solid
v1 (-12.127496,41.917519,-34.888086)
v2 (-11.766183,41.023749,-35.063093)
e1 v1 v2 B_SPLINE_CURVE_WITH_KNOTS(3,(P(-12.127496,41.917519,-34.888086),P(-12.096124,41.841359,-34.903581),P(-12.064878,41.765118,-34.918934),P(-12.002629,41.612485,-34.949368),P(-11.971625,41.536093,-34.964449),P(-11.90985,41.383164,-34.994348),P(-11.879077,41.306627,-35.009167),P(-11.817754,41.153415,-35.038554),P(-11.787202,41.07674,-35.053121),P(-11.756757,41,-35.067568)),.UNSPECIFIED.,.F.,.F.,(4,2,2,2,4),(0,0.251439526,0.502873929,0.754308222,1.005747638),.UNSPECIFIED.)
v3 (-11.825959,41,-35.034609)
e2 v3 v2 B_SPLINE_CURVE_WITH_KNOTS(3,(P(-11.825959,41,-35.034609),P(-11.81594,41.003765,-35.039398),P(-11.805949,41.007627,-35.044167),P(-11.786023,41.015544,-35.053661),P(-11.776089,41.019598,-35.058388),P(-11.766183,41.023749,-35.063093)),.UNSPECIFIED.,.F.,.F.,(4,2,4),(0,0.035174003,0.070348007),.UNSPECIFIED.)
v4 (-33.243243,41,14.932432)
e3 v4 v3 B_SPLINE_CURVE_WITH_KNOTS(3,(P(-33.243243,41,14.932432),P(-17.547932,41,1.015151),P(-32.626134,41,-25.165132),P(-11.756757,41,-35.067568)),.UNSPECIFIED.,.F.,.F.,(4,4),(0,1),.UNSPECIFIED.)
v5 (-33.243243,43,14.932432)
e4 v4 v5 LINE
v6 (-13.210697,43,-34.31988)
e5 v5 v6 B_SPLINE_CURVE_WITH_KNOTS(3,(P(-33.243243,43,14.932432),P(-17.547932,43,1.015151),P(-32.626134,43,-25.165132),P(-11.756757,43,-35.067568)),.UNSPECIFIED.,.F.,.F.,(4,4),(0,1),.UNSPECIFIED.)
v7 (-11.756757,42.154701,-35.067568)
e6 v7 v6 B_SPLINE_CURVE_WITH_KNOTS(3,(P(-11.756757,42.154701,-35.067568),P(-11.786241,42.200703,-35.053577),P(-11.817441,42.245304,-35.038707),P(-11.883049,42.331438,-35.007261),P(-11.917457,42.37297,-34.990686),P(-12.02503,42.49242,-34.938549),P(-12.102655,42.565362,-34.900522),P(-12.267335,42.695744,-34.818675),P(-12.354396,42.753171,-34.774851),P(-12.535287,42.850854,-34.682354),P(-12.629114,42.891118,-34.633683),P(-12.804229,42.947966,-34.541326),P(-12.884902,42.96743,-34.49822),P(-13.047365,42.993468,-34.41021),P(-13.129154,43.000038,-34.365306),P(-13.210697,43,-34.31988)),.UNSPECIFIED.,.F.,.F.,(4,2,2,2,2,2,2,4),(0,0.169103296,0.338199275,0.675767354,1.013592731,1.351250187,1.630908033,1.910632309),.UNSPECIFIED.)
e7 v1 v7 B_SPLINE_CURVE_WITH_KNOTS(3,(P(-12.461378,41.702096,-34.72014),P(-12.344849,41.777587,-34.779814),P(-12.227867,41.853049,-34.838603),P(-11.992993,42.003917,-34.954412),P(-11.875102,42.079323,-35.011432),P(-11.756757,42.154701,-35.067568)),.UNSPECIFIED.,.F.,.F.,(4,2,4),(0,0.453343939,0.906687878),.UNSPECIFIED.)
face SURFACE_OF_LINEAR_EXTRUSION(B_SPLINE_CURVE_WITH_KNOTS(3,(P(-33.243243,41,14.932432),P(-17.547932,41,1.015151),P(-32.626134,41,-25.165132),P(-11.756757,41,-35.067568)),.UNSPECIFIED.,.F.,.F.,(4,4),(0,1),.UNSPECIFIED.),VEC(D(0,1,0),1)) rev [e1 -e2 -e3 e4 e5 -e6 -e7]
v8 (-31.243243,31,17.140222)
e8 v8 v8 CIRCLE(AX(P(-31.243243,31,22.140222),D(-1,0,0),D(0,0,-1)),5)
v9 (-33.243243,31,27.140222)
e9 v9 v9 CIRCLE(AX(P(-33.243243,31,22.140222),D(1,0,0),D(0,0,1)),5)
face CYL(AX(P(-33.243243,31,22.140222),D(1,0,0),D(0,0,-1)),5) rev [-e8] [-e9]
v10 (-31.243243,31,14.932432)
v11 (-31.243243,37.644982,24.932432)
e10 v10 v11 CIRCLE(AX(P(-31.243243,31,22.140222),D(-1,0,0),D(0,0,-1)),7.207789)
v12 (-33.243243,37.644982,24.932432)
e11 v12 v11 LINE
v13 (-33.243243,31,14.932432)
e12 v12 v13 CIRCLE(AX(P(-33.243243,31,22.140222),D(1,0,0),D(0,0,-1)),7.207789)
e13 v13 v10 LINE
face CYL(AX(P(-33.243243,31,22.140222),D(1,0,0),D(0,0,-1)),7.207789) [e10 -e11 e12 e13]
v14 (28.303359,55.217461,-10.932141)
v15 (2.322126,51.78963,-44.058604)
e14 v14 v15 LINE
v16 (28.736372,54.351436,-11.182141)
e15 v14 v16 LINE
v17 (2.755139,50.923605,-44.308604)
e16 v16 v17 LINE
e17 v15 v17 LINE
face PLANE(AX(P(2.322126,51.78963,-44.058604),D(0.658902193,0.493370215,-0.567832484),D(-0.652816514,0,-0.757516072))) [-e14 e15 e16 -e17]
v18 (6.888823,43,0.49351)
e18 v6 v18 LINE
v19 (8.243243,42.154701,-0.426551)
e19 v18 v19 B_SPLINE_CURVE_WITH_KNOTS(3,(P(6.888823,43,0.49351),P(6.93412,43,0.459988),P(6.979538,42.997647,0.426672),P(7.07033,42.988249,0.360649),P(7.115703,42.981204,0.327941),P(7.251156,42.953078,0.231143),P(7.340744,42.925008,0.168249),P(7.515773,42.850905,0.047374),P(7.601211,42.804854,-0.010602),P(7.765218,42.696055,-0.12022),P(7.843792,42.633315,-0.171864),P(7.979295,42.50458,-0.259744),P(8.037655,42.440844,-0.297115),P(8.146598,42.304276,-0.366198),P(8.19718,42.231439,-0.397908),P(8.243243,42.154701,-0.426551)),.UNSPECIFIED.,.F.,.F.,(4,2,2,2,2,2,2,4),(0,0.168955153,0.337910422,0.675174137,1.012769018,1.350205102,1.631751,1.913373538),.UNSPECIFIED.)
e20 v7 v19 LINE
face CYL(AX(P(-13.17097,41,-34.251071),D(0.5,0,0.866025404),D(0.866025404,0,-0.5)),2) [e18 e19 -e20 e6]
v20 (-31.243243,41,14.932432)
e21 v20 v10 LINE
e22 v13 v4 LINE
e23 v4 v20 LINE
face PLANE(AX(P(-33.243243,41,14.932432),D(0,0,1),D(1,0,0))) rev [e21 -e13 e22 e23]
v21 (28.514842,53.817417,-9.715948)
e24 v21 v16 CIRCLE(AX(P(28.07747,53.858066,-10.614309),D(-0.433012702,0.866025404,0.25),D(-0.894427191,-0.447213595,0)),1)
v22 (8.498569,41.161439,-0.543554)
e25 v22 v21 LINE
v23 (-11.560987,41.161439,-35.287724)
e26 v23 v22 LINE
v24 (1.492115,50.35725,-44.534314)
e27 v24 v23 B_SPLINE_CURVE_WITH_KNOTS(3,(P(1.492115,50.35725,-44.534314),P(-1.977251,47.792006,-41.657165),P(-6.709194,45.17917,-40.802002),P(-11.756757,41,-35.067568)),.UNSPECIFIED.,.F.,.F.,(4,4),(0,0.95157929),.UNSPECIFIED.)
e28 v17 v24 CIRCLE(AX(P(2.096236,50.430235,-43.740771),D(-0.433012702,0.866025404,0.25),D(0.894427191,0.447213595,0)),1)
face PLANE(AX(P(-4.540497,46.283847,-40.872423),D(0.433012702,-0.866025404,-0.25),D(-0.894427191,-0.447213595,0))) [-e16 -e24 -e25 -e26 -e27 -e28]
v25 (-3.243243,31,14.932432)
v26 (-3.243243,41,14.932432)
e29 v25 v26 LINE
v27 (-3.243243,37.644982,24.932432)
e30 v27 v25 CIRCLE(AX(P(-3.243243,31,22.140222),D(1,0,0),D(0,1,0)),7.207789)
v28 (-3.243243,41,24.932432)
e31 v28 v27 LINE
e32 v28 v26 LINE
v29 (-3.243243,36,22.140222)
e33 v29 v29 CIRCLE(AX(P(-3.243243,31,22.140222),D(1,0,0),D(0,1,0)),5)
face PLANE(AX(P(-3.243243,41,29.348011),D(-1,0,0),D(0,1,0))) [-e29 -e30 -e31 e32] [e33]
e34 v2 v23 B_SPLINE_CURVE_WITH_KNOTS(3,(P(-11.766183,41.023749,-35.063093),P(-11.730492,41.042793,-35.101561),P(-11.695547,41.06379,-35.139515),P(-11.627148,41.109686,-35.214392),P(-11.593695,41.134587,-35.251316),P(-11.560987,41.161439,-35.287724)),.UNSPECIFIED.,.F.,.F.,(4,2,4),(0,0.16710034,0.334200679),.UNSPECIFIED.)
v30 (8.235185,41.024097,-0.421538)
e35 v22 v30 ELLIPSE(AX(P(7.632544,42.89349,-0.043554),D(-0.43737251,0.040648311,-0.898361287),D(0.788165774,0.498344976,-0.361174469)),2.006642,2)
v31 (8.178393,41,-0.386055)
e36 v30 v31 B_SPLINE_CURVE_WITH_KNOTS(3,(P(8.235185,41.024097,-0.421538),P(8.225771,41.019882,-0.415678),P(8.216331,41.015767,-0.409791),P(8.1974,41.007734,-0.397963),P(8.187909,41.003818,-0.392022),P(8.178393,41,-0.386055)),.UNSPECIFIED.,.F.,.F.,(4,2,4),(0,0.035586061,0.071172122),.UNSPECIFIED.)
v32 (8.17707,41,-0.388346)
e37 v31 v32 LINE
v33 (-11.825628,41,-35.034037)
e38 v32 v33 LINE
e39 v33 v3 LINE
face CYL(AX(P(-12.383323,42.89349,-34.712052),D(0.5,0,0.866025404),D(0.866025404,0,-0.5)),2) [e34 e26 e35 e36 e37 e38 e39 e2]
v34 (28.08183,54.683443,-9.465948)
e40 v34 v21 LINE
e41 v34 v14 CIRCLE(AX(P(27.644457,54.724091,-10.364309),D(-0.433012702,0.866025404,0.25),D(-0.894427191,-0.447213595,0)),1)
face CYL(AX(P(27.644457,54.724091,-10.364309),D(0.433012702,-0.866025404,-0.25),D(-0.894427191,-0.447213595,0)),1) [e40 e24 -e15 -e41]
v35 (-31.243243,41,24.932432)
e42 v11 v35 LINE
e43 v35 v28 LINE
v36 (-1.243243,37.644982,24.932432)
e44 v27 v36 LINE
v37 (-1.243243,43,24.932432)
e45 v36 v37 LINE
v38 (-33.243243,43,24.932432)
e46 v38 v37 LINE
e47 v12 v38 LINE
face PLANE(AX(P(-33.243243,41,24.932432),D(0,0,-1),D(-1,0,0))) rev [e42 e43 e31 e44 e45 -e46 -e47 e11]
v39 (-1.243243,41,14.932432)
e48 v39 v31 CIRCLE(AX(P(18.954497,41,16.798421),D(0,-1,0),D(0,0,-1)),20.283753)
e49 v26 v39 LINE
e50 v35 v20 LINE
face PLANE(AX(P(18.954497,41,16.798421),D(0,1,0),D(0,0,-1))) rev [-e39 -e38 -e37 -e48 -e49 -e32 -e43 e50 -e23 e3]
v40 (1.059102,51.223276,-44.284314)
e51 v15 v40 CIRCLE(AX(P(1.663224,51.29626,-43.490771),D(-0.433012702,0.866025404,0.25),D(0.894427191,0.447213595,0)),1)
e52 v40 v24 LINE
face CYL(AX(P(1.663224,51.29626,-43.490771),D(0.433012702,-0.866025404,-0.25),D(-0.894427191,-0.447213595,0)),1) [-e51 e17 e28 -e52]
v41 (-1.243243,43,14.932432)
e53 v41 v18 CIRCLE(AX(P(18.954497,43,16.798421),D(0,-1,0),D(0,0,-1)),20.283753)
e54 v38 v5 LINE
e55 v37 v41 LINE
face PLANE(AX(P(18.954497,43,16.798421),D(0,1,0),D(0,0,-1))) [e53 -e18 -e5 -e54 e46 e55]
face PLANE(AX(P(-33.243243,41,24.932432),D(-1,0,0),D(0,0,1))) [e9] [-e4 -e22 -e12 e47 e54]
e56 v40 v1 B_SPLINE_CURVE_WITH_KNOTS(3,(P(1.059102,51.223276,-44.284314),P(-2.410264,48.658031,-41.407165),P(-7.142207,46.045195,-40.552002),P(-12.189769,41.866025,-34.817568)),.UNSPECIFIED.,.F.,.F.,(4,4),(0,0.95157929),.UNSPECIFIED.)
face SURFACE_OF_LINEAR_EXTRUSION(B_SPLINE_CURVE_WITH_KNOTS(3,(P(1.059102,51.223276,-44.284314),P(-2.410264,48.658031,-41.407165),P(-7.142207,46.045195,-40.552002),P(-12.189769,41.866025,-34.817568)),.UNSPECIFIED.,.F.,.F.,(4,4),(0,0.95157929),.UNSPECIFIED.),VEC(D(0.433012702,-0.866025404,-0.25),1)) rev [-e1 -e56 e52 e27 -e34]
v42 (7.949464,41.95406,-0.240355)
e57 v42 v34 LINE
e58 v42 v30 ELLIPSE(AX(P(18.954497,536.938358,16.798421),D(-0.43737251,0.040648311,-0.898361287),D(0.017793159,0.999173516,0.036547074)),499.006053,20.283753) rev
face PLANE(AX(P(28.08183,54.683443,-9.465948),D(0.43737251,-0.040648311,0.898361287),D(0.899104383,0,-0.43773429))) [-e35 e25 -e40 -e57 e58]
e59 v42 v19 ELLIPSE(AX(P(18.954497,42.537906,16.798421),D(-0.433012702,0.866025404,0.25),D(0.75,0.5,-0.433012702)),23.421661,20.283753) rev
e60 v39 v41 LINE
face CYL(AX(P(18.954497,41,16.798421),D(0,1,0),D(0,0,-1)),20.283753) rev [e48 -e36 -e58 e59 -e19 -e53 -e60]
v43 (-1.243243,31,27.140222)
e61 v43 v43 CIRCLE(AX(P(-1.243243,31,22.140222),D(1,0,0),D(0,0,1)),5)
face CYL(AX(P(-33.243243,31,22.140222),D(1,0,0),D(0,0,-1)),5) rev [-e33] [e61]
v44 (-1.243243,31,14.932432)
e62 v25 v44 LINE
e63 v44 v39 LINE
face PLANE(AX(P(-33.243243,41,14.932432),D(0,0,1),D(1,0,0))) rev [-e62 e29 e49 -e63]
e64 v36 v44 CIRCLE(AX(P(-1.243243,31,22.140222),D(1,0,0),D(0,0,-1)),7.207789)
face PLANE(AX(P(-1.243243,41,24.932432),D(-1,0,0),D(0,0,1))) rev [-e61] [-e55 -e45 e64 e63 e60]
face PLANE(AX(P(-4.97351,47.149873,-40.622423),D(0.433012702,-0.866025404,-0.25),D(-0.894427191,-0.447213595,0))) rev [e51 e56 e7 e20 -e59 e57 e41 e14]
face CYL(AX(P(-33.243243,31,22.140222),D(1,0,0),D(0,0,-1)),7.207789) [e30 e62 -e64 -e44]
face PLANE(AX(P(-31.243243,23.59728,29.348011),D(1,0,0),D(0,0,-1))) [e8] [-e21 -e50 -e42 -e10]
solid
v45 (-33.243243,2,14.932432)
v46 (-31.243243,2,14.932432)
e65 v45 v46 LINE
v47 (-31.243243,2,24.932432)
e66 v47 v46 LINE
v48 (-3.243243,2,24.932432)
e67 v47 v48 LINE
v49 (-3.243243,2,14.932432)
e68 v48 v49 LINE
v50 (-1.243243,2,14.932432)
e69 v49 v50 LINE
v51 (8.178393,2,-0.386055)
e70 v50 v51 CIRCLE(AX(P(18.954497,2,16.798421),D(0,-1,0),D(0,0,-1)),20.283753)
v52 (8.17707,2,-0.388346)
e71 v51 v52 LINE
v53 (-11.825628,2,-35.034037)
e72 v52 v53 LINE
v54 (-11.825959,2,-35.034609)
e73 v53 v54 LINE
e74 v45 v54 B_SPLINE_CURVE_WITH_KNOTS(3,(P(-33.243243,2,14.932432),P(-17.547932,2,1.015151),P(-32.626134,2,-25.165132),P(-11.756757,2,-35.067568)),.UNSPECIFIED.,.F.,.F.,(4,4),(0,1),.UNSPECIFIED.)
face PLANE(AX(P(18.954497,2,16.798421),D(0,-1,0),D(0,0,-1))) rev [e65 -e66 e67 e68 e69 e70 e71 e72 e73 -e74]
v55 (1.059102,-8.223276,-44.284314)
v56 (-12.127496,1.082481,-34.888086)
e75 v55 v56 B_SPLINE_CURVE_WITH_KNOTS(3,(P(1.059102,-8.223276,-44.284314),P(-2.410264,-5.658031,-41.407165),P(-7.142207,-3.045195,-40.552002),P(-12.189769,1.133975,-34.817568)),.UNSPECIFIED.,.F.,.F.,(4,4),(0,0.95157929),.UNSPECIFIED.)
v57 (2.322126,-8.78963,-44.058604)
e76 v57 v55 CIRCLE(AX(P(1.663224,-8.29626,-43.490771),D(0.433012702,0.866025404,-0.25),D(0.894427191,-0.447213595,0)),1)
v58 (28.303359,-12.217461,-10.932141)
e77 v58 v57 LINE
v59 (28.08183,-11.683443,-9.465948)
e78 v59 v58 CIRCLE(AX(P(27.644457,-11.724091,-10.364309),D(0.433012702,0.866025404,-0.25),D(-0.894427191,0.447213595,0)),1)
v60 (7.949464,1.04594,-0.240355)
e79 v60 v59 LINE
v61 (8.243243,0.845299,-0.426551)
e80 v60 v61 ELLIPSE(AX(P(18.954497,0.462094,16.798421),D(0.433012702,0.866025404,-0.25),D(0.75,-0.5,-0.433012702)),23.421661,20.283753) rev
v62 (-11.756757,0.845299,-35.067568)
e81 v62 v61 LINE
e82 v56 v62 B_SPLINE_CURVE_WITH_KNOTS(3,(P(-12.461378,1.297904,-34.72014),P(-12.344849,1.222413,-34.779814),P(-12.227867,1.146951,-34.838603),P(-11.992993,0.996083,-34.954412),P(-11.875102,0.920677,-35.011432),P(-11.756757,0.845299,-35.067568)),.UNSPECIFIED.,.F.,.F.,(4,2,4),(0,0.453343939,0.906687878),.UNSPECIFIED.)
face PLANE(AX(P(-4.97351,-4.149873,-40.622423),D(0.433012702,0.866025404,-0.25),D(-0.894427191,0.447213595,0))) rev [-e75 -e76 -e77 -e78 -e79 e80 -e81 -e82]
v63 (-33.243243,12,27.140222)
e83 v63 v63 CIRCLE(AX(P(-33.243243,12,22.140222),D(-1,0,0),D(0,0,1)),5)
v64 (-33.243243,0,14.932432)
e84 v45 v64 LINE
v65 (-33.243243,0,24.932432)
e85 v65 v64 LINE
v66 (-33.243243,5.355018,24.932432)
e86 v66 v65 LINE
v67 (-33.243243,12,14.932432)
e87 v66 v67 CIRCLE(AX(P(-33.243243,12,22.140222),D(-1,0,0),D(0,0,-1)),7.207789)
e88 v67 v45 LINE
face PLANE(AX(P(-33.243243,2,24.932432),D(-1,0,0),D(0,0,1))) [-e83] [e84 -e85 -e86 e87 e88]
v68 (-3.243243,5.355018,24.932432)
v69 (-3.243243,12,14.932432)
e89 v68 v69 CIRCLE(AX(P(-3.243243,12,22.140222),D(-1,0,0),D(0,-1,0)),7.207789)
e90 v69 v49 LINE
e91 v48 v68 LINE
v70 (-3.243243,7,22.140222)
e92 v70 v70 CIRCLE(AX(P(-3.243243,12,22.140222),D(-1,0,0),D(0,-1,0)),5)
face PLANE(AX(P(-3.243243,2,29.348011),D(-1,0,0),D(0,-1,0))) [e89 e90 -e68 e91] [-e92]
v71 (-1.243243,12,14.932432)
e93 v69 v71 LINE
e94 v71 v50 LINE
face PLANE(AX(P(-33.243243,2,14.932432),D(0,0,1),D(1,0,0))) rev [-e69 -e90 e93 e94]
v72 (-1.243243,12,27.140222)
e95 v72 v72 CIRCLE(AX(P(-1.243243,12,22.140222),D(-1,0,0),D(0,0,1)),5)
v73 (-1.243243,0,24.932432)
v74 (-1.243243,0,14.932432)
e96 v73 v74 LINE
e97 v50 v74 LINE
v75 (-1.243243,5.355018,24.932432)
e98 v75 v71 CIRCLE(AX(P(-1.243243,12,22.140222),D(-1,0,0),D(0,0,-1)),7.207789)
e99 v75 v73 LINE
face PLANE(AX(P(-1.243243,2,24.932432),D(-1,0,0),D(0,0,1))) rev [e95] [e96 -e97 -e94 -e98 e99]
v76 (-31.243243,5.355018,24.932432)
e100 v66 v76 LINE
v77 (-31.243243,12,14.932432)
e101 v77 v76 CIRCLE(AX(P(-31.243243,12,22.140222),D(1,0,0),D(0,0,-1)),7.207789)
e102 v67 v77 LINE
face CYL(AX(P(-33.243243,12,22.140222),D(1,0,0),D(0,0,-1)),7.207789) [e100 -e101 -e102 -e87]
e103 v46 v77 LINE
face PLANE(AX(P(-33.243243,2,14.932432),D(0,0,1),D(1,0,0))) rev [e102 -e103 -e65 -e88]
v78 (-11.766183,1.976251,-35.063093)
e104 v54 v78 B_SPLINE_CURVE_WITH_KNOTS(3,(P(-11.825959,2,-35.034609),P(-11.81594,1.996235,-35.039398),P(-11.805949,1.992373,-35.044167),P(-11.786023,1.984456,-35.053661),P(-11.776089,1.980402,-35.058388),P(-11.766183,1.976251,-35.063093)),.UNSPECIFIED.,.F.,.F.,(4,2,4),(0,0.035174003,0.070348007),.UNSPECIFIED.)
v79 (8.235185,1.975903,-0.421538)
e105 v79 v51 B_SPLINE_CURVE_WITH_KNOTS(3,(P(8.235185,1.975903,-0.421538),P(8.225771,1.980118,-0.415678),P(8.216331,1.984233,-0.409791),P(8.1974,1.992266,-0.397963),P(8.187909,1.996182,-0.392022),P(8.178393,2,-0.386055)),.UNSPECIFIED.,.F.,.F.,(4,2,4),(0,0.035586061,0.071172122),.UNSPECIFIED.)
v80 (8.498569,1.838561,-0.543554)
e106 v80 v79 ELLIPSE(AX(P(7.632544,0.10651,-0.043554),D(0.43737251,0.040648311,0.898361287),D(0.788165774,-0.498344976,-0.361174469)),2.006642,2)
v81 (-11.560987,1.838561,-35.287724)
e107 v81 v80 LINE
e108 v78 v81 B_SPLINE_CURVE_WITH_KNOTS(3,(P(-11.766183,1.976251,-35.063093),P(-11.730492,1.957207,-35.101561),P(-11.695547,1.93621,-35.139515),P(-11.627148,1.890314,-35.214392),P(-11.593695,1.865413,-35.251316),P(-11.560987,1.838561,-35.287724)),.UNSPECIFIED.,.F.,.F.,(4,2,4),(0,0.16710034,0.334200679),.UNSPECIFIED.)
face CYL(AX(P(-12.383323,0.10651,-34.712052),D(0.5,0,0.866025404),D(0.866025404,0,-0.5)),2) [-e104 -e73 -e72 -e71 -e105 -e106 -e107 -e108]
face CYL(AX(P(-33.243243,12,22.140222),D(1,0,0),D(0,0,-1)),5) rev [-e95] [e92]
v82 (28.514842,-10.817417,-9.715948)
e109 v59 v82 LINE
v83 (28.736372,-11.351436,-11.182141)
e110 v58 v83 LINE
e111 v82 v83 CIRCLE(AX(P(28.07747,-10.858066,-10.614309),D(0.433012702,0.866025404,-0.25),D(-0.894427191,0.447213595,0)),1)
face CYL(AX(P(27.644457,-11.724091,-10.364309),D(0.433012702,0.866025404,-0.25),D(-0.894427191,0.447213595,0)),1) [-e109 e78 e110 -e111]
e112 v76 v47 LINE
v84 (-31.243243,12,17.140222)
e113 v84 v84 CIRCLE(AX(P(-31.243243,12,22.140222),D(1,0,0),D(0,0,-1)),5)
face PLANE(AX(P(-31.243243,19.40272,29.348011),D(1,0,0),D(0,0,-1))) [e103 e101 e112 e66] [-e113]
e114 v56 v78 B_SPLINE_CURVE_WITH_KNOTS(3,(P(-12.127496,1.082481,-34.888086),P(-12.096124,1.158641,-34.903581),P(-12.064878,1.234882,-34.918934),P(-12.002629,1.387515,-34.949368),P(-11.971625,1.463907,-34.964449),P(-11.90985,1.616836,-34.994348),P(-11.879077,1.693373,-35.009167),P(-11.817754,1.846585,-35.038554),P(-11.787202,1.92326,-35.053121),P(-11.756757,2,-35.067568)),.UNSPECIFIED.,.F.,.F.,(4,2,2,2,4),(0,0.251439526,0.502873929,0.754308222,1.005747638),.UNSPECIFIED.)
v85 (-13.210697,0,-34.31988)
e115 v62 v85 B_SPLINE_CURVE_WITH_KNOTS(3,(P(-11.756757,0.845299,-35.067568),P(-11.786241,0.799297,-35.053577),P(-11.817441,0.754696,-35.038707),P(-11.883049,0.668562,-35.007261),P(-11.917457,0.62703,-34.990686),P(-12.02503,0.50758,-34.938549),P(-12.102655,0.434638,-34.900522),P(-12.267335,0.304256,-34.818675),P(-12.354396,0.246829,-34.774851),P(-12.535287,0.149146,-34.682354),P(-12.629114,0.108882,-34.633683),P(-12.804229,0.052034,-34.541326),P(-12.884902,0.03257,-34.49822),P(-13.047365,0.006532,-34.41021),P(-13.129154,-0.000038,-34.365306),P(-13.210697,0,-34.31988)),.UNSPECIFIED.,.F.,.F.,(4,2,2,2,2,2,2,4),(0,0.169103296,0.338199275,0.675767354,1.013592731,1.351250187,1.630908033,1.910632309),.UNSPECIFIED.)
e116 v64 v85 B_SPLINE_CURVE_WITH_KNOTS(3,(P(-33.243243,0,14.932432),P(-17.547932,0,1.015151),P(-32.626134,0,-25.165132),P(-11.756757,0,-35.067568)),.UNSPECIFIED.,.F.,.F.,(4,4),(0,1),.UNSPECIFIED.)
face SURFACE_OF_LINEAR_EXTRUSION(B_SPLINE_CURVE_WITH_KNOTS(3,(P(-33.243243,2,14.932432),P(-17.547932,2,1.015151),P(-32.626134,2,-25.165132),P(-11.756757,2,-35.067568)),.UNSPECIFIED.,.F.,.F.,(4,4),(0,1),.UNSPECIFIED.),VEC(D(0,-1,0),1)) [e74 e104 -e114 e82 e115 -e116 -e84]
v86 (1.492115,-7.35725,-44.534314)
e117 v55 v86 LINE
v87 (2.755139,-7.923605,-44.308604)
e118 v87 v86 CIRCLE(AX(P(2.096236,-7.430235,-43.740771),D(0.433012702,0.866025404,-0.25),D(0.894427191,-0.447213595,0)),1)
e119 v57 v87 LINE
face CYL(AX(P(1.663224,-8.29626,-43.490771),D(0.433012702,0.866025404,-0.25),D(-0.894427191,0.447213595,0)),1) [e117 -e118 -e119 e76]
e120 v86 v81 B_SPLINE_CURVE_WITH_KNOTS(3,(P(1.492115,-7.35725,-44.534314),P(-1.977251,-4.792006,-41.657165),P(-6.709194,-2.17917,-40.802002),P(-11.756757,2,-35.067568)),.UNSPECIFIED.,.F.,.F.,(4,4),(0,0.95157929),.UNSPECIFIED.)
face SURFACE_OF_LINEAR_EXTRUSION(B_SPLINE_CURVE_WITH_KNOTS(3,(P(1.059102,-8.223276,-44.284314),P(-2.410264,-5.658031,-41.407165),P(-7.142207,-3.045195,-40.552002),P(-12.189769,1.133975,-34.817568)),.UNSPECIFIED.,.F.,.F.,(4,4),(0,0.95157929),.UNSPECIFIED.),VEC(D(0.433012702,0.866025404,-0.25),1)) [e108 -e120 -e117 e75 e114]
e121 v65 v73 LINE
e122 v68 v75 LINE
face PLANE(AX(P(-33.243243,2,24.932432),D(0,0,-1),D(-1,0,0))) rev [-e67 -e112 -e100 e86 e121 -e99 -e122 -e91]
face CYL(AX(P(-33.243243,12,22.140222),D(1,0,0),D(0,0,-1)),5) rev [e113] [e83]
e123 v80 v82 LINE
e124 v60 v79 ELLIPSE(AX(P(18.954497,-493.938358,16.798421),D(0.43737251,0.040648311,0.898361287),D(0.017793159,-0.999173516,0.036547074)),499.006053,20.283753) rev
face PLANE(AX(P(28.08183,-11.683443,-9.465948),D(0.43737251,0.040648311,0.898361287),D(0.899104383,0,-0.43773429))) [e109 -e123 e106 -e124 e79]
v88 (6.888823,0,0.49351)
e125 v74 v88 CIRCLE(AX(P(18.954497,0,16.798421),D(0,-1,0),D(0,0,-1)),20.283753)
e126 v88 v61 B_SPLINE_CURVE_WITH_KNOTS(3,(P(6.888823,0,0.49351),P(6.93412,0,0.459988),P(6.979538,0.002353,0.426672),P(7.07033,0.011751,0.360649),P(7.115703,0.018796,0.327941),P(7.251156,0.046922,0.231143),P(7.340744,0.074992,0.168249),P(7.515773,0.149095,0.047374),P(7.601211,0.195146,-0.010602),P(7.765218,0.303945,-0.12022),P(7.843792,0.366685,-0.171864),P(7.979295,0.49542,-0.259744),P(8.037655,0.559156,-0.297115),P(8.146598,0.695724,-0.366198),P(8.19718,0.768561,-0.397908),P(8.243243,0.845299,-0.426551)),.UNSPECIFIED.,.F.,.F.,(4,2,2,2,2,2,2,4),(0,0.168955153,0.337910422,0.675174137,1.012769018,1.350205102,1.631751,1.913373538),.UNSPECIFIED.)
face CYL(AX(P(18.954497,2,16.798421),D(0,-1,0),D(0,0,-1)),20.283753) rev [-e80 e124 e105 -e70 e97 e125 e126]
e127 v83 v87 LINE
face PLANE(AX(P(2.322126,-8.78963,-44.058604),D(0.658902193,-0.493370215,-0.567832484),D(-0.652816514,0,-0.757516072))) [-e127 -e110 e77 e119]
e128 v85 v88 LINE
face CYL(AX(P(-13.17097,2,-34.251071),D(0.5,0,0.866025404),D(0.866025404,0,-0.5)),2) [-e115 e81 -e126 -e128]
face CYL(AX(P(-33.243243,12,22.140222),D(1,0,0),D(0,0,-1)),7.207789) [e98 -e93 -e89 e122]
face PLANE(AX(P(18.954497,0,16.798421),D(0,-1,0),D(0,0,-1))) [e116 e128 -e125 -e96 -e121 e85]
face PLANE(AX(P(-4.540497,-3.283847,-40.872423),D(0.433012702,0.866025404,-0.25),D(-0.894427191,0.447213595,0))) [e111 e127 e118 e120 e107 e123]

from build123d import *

# Parameters (mm, degrees)
EXTRUDE_1_DEPTH     = 2
SKETCH_2_R          = 5
EXTRUDE_2_DEPTH     = 16
SKETCH_6_W          = 28
SKETCH_6_H          = 17.402719954
CUT_EXTRUDE_1_DEPTH = 52.997949028
EXTRUDE_3_DEPTH     = 1
FILLET_2_R          = 2
FILLET_3_R          = 2
SKETCH_8_R          = 5.82594274
EXTRUDE_4_DEPTH     = 25
SKETCH_9_W          = 11.65188548
SKETCH_9_H          = 25
CUT_EXTRUDE_2_DEPTH = 22
SKETCH_11_R         = 5.664171458
EXTRUDE_5_DEPTH     = 40
SKETCH_12_W         = 11.328342916
SKETCH_12_H         = 39
CUT_EXTRUDE_3_DEPTH = 20
SKETCH_12_2_W       = 11.328342916
SKETCH_12_2_H       = 39
CUT_EXTRUDE_4_DEPTH = 10


with BuildPart() as part:
    # 草图1 → 凸台-拉伸1 (new body)
    with BuildSketch(Plane(origin=(0, 0, 0), x_dir=(1, 0, 0), z_dir=(0, 1, 0))):
        with BuildLine():
            Line((-33.243243243, -24.932432432), (-1.243243243, -24.932432432))
            Line((-1.243243243, -24.932432432), (-1.243243243, -14.932432432))
            ThreePointArc((-1.243243243, -14.932432432), (1.697148643, -6.13940818), (8.243243243, 0.426551416))
            Line((8.243243243, 0.426551416), (-11.756756757, 35.067567568))
            add(Edge.make_bspline(
                [(-33.243243243, -14.932432432), (-17.547932251, -1.015151266), (-32.626133519, 25.165131833), (-11.756756757, 35.067567568)],
                knots=[0, 0, 0, 0, 1, 1, 1, 1], degree=3))
            Line((-33.243243243, -14.932432432), (-33.243243243, -24.932432432))
        make_face()
    extrude(amount=EXTRUDE_1_DEPTH)

    # 草图2 → 凸台-拉伸2 (add, symmetric)
    with BuildSketch(Plane.ZY.offset(17.243243243)):
        with BuildLine():
            Line((14.932432432, 2), (14.932432432, 12))
            ThreePointArc((14.932432432, 12), (26.129367198, 18.003244699), (24.932432432, 5.355017858))
            Line((24.932432432, 5.355017858), (24.932432432, 2))
            Line((24.932432432, 2), (14.932432432, 2))
        make_face()
        with Locations((22.140221816, 12)):
            Circle(SKETCH_2_R, mode=Mode.SUBTRACT)
    extrude(amount=EXTRUDE_2_DEPTH, both=True)

    # 草图6 → 切除-拉伸1 (cut, through all)
    with BuildSketch(Plane.XY):
        with Locations((-17.243243243, 10.701359977)):
            Rectangle(SKETCH_6_W, SKETCH_6_H)
    extrude(amount=CUT_EXTRUDE_1_DEPTH, mode=Mode.SUBTRACT)

    # 草图7 → 凸台-拉伸3 (add)
    with BuildSketch(Plane(origin=(2.341783653, 4.683567307, -1.352029423), x_dir=(0.49999999999999495, 0, 0.8660254037844416), z_dir=(0.43301270189222174, 0.866025403784438, -0.24999999999999803))):
        with BuildLine():
            Line((-36.994807064, 25.214344641), (4.684167628, 32.070006247))
            ThreePointArc((4.684167628, 32.070006247), (5.524135177, 31.818639991), (5.843163839, 31.001969195))
            Line((5.843163839, 31.001969195), (3.752217259, 5.367134614))
            Line((3.752217259, 5.367134614), (3.752217259, 5.300961696))
            Line((3.752217259, 5.300961696), (-36.253180241, 5.300961696))
            Line((-36.253180241, 5.300961696), (-36.247782741, 5.367134614))
            add(Edge.make_bspline(
                [(-36.247782741, 5.367134614), (-38.690167695, 13.725474556), (-37.064789312, 18.95114602), (-37.821789964, 24.081635177)],
                knots=[0, 0, 0, 0, 0.95157929, 0.95157929, 0.95157929, 0.95157929], degree=3))
            ThreePointArc((-37.821789964, 24.081635177), (-37.640152143, 24.817264549), (-36.994807064, 25.214344641))
        make_face()
    extrude(amount=-EXTRUDE_3_DEPTH)

    # 圆角2
    # the kernel refuses this fillet: 2 mm, written as the material it takes off along each edge
    with BuildSketch(Plane(origin=(10.284484696, 0, 3.10898249), x_dir=(-0.8660254037844416, 0, 0.49999999999999495), z_dir=(-0.49999999999999495, 0, -0.8660254037844416))) as fillet_2_piece_1:
        with BuildLine():
            CenterArc((1.632993162, 2), FILLET_2_R, 215.264389683, 54.735610317)
            Line((0, 0.845299462), (-0.032659863, 0.822205451))
            ThreePointArc((-0.032659863, 0.822205451), (-0.04, 0.422649731), (-0.04, 0))
            Line((-0.04, 0), (0, -0.04))
            Line((0, -0.04), (1.632993162, -0.04))
            Line((1.632993162, -0.04), (1.632993162, 0))
        make_face()
    extrude(amount=48.164965809, mode=Mode.SUBTRACT)

    # 圆角3
    # the kernel refuses this fillet: 2 mm, written as the material it takes off along each edge
    with BuildSketch(Plane(origin=(8.679926515, 2.033086459, 0.444421053), x_dir=(0.7500000000000034, -0.499999999999998, -0.4330127018922155), z_dir=(-0.49999999999999495, 0, -0.8660254037844416))) as fillet_3_piece_1:
        with BuildLine():
            CenterArc((0.389050368, 2), FILLET_3_R, 258.783012488, 11.216987512)
            Line((0, 0.038204952), (-0.007781007, -0.001030949))
            ThreePointArc((-0.007781007, -0.001030949), (-0.04, 0.019102476), (-0.04, 0))
            Line((-0.04, 0), (0, -0.04))
            Line((0, -0.04), (0.389050368, -0.04))
            Line((0.389050368, -0.04), (0.389050368, 0))
        make_face()
    extrude(amount=41.950649342, mode=Mode.SUBTRACT)

    # 草图8 → 凸台-拉伸4 (add)
    with BuildSketch(Plane(origin=(0, 2, 0), x_dir=(1, 0, 0), z_dir=(0, 1, 0))):
        with Locations(Location((-15.759203843, -7.518855646, 0), (0, 0, 90))):
            Circle(SKETCH_8_R)
    extrude(amount=EXTRUDE_4_DEPTH)

    # 草图9 → 切除-拉伸2 (cut)
    with BuildSketch(Plane.XY):
        with Locations((-15.759203843, 14.5)):
            Rectangle(SKETCH_9_W, SKETCH_9_H)
    extrude(amount=CUT_EXTRUDE_2_DEPTH, mode=Mode.SUBTRACT)

    # 草图11 → 凸台-拉伸5 (add)
    with BuildSketch(Plane(origin=(0, 2, 0), x_dir=(1, 0, 0), z_dir=(0, 1, 0))):
        with Locations(Location((-15.437441139, -2.706519555, 0), (0, 0, 90))):
            Circle(SKETCH_11_R)
    extrude(amount=EXTRUDE_5_DEPTH)

    # 镜向1: part across plane


with BuildPart() as part_1:
    add(part.part)
    add(part.part.mirror(Plane.ZX.offset(21.5)))

    # 草图12 → 切除-拉伸3 (cut)
    with BuildSketch(Plane.XY):
        with Locations((-15.437441139, 21.5)):
            Rectangle(SKETCH_12_W, SKETCH_12_H)
    extrude(amount=CUT_EXTRUDE_3_DEPTH, mode=Mode.SUBTRACT)

    # 草图12<2> → 切除-拉伸4 (cut)
    with BuildSketch(Plane.XY):
        with Locations((-15.437441139, 21.5)):
            Rectangle(SKETCH_12_2_W, SKETCH_12_2_H)
    extrude(amount=-CUT_EXTRUDE_4_DEPTH, mode=Mode.SUBTRACT)


with BuildPart() as cut_extrude_4_piece_1:
    # of the separate pieces the step leaves, piece 1, a body of its own (cut_extrude_4_pieces)
    add(part_1.part.solids().sort_by_distance((-33.243243243, 5.355017858, 24.932432432))[0])


with BuildPart() as cut_extrude_4_piece_2:
    # of the separate pieces the step leaves, piece 2, a body of its own (cut_extrude_4_pieces)
    add(part_1.part.solids().sort_by_distance((-3.243243243, 41, 14.932432432))[0])


solid = Compound([cut_extrude_4_piece_1.part, cut_extrude_4_piece_2.part])
